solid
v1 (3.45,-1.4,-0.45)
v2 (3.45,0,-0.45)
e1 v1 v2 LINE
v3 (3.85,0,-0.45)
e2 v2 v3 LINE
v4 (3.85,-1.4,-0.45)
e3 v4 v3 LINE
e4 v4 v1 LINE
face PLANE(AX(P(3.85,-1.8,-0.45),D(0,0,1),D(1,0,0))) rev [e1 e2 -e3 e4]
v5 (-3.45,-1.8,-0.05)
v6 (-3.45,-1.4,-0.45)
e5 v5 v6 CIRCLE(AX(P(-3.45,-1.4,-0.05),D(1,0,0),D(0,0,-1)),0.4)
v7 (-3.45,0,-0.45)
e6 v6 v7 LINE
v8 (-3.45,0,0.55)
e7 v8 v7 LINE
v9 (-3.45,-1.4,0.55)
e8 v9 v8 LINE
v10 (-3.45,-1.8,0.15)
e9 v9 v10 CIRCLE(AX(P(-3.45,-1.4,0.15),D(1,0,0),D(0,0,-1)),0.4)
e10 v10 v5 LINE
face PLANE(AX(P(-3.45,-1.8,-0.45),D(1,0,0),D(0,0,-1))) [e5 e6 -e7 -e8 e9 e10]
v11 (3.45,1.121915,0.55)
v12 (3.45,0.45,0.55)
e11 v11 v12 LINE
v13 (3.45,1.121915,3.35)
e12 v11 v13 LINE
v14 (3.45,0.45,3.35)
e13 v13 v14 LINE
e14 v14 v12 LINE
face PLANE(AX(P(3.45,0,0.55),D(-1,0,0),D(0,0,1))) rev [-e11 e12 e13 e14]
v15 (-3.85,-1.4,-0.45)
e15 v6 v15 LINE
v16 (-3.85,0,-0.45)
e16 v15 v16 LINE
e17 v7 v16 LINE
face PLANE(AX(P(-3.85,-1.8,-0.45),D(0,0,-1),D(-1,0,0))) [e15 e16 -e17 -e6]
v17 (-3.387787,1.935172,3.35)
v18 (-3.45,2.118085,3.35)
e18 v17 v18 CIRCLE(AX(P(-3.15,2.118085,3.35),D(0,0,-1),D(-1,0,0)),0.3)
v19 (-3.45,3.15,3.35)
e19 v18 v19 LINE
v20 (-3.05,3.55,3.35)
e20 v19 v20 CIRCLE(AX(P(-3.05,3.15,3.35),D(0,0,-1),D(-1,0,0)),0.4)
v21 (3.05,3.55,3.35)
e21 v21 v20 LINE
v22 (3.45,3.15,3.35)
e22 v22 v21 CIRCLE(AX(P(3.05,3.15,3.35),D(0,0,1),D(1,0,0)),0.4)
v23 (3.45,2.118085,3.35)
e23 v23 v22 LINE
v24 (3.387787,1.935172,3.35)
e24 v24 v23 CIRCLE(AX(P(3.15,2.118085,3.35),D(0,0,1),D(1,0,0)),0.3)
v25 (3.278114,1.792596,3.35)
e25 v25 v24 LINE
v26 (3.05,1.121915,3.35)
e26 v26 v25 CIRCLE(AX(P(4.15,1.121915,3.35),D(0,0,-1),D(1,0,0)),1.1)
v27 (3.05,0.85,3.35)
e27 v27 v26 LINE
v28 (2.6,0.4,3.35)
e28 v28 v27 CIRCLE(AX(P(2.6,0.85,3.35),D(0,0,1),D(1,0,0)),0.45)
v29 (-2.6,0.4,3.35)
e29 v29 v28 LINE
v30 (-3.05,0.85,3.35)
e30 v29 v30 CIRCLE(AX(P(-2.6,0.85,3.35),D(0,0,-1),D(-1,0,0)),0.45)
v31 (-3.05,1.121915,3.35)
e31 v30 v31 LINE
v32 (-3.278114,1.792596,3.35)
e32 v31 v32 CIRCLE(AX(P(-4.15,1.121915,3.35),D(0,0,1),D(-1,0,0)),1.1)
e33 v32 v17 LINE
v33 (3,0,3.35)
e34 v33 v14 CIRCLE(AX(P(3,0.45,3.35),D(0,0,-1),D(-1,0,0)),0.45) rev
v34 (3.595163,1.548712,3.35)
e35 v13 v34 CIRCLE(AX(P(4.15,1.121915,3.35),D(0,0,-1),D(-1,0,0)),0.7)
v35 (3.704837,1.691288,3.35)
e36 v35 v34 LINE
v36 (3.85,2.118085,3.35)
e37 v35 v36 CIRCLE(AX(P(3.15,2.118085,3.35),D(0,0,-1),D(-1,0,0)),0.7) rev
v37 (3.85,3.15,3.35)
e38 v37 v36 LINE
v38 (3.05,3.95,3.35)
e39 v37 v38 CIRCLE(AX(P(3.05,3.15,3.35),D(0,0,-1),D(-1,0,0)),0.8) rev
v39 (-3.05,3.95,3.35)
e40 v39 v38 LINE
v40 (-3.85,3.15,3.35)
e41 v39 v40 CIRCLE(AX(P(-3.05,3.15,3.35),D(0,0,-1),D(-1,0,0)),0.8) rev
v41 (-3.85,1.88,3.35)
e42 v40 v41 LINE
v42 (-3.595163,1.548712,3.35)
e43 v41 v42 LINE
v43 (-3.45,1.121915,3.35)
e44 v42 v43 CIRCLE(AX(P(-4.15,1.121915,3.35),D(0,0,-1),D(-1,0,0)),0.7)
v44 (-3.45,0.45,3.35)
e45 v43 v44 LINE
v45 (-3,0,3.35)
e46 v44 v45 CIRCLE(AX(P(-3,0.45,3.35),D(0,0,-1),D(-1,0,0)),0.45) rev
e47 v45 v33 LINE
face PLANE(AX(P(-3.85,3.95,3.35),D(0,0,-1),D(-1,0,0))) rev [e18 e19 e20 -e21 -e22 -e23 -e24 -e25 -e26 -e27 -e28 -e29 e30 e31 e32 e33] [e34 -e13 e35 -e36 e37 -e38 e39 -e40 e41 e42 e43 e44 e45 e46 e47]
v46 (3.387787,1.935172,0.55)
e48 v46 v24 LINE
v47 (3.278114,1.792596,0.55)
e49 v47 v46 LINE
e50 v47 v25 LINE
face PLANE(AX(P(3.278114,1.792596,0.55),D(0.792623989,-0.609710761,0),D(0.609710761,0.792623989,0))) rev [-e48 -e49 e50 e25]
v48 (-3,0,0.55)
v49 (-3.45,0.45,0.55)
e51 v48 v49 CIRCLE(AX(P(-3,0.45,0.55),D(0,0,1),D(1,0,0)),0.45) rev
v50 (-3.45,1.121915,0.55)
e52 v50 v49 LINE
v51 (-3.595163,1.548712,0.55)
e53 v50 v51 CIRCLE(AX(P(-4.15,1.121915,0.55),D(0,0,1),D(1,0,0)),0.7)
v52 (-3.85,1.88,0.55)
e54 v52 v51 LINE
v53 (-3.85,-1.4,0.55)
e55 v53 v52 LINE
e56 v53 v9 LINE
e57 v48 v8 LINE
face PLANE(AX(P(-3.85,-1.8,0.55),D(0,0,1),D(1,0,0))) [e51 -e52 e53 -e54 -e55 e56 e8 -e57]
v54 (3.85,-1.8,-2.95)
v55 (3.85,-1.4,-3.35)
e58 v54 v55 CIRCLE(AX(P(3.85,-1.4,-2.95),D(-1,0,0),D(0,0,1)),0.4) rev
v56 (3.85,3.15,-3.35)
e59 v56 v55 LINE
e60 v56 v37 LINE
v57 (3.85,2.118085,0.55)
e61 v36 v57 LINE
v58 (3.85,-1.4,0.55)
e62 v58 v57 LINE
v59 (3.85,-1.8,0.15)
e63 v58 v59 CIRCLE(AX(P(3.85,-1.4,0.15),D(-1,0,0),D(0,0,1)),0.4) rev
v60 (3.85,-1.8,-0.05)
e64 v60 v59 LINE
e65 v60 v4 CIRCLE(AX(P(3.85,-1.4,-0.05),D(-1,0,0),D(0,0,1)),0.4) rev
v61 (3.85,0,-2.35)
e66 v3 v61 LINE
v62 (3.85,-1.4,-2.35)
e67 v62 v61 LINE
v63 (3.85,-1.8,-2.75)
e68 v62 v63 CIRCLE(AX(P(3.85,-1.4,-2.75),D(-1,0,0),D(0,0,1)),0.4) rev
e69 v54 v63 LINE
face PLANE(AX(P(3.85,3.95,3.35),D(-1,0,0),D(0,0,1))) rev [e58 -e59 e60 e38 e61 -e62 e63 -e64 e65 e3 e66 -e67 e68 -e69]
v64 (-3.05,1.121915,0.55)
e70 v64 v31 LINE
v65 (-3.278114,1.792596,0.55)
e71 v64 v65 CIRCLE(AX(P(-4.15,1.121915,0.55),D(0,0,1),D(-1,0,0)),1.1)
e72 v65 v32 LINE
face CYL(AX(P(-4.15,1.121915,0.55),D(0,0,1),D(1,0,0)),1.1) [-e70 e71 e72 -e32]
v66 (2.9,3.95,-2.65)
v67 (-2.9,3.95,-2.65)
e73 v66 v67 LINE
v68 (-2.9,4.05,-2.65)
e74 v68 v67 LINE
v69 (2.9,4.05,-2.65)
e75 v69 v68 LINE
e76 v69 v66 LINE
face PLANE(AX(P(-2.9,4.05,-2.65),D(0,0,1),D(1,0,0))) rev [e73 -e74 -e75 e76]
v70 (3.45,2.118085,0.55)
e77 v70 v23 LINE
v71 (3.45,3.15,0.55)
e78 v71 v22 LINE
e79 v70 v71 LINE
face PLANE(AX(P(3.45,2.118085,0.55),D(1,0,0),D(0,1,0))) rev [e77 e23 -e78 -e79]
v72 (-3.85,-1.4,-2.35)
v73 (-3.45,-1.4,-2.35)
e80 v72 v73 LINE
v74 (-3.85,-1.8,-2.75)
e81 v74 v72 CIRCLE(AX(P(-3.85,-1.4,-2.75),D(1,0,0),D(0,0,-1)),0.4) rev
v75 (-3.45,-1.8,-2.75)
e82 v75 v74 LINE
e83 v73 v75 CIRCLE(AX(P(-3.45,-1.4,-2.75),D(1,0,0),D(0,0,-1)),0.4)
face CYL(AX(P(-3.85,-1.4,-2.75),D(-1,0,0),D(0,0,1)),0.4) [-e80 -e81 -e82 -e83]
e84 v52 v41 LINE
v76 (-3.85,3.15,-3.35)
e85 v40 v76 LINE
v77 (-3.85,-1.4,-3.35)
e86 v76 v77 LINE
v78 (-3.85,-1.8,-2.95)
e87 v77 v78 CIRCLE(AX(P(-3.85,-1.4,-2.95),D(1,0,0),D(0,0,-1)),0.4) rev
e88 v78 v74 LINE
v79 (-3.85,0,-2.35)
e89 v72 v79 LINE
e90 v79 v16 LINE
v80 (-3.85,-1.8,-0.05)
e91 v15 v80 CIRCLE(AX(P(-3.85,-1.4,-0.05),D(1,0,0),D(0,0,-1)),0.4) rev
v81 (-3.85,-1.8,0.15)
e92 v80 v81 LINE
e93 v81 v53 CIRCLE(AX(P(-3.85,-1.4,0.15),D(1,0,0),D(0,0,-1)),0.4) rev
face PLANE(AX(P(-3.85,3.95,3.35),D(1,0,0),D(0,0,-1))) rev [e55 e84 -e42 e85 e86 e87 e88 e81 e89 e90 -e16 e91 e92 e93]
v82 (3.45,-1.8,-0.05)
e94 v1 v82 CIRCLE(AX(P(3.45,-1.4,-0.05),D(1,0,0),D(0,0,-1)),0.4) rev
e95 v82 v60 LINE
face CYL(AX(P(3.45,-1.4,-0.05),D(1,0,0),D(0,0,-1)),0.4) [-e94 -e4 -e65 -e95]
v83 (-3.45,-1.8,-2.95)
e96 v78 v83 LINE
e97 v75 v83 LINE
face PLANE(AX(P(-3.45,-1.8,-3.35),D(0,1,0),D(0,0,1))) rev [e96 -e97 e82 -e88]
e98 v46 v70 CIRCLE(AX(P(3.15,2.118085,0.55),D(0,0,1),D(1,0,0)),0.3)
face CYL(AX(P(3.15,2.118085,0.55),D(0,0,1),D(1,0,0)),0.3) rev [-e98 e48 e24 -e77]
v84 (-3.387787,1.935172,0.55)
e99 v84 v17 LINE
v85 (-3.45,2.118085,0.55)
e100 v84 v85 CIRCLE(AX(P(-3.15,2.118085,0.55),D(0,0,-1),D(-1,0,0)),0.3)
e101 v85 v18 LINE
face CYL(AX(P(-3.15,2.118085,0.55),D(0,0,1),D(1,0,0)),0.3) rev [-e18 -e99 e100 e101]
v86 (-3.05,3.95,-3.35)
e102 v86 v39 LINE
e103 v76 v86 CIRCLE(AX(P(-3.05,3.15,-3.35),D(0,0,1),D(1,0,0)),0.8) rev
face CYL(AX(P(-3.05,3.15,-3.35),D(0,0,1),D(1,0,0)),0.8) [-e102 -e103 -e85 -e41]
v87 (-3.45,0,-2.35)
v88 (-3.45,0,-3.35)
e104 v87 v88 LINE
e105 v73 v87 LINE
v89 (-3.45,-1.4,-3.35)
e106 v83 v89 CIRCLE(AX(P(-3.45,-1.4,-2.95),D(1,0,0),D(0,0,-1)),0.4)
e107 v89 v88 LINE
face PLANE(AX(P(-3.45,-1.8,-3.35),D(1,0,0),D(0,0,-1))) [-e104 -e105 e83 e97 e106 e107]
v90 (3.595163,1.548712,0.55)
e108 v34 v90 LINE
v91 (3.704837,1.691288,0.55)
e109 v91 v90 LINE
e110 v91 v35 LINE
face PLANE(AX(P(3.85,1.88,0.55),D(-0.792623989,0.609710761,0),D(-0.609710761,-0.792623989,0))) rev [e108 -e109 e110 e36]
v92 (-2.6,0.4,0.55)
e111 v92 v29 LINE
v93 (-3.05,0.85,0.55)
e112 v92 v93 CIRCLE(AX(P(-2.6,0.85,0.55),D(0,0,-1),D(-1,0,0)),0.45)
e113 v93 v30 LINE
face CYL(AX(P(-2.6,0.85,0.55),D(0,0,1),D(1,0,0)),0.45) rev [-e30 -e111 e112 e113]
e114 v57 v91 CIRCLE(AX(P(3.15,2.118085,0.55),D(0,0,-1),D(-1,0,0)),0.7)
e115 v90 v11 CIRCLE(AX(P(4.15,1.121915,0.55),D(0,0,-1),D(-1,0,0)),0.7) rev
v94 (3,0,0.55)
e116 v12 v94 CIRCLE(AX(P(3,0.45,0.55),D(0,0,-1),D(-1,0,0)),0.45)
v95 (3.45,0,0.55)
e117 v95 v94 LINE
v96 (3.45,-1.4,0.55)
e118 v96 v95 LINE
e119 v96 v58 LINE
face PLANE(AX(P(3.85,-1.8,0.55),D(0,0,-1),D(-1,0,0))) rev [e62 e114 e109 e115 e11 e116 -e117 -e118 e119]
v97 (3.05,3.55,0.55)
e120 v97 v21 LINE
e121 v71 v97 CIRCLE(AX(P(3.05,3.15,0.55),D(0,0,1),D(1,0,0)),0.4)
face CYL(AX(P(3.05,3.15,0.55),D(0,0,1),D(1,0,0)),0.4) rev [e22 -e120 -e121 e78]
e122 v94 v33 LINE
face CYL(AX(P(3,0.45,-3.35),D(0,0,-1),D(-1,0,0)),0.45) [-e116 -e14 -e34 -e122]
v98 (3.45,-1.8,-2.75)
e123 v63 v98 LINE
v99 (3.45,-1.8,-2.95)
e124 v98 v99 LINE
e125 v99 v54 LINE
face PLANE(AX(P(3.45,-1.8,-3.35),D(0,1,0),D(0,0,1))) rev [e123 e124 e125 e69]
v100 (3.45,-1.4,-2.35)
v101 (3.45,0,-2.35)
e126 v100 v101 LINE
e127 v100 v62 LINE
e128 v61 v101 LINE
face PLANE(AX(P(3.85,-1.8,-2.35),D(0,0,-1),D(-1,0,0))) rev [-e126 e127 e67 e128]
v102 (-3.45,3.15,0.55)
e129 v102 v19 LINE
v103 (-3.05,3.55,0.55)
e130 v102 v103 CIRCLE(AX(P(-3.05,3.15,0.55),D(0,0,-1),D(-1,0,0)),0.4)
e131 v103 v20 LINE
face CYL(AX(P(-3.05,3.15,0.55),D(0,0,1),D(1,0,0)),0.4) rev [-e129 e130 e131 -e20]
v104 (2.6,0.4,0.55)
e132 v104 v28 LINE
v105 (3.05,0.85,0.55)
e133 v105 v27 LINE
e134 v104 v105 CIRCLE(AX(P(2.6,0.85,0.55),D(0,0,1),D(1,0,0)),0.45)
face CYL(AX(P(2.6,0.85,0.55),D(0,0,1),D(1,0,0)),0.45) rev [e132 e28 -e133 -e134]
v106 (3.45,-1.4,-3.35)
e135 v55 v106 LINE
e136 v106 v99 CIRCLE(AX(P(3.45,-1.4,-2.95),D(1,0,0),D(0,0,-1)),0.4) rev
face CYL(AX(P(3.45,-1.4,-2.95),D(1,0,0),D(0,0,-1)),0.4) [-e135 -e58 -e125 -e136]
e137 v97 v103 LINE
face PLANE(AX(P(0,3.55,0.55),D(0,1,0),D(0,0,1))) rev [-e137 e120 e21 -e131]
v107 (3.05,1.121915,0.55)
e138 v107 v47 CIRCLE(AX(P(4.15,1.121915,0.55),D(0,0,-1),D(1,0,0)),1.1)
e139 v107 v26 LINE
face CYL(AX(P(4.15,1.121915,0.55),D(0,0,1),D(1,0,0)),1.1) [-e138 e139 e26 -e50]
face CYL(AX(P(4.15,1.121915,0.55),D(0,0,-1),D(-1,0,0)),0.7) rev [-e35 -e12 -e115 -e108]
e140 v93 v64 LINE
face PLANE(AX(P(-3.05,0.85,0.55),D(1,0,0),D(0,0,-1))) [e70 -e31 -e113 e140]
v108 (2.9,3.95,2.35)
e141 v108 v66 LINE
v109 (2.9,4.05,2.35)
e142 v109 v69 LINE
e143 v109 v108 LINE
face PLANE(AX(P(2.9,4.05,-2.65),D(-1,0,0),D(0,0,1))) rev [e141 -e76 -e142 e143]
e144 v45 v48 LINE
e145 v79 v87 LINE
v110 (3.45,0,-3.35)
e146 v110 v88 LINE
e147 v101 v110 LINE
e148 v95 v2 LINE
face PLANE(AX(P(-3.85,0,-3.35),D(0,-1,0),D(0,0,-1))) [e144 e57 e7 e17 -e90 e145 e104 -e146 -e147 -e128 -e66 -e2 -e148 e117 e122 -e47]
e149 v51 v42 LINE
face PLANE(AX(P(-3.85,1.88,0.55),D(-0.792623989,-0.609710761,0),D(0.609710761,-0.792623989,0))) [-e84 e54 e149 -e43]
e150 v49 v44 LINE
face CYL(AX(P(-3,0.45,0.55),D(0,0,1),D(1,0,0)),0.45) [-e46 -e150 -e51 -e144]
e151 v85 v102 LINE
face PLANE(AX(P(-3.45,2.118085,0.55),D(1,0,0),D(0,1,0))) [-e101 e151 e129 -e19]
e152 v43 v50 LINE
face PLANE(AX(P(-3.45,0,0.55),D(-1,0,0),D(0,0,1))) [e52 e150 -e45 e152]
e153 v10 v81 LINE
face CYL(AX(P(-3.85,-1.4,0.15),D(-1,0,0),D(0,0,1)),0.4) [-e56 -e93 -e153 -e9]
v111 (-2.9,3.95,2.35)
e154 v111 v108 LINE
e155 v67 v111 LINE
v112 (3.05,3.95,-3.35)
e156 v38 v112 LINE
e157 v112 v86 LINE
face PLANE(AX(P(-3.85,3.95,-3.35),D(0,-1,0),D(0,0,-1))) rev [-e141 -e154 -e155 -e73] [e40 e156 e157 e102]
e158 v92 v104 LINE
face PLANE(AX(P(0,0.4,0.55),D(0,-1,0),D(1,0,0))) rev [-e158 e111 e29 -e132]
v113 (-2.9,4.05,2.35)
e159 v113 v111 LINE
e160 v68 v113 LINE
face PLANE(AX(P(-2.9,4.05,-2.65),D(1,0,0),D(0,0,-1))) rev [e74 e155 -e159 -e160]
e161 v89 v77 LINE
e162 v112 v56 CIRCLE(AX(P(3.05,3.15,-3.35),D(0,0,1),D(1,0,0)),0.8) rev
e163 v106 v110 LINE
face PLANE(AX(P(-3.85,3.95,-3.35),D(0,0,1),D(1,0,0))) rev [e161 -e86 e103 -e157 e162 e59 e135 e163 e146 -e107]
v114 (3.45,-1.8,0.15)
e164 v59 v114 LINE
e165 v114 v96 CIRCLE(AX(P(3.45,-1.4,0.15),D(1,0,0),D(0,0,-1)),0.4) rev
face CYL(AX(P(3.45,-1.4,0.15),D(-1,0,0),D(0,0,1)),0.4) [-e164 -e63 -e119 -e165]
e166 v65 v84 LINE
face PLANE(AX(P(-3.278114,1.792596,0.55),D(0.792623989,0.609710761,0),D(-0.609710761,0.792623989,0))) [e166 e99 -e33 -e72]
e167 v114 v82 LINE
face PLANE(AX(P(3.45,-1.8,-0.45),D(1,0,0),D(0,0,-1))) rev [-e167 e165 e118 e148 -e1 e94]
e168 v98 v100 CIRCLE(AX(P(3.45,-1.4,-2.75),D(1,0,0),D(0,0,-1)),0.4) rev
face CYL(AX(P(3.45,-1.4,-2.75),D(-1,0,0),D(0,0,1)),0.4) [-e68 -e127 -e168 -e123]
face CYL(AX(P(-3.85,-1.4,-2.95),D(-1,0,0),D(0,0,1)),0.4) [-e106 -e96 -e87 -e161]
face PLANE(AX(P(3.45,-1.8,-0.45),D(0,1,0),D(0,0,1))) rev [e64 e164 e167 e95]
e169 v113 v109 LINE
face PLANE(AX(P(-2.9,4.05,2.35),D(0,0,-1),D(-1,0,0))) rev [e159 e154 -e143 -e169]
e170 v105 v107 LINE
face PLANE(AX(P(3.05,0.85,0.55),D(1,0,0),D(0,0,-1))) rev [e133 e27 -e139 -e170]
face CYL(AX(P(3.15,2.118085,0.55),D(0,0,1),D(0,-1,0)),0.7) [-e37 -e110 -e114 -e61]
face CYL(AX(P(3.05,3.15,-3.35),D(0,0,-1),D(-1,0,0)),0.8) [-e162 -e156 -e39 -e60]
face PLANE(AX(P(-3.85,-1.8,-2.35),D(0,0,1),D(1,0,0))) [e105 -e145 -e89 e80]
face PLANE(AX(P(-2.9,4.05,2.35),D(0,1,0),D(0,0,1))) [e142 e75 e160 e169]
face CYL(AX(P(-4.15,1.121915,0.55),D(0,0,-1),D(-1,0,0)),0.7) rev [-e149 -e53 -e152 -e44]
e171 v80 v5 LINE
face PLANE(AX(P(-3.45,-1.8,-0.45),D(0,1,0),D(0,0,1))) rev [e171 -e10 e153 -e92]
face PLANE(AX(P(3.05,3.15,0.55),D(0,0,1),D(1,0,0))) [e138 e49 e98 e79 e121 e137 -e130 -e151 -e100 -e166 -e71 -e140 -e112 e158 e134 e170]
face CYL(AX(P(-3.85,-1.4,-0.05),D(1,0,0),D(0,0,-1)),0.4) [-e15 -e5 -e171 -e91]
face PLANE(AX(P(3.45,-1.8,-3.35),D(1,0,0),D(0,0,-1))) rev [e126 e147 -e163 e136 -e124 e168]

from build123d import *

# Parameters (mm, degrees)
SKETCH1_W              = 7.7
SKETCH1_H              = 6.7
BOSS_EXTRUDE1_DEPTH    = 3.95
SKETCH2_W              = 0.4
SKETCH2_H              = 1
BOSS_EXTRUDE2_DEPTH    = 1.8
FILLET1_R              = 0.4
LPATTERN1_COUNT        = 2
LPATTERN1_PITCH        = 2.9
FILLET1_OF_LPATTERN1_R = 0.4
FILLET2_R              = 0.8
CUT_EXTRUDE1_DEPTH     = 2.8
FILLET3_R              = 0.45
FILLET4_R              = 0.7
CUT_EXTRUDE2_DEPTH     = 2.8
MIRROR3_START          = 0.55
MIRROR3_DEPTH          = 2.8
MIRROR3_START_2        = -2.95
MIRROR3_2_OUTLINE_W    = 0.4
MIRROR3_2_OUTLINE_H    = 1.8
MIRROR3_2_DEPTH        = 0.2
MIRROR3_START_3        = -0.05
MIRROR3_3_OUTLINE_W    = 0.4
MIRROR3_3_OUTLINE_H    = 1.8
MIRROR3_3_DEPTH        = 0.2
MIRROR3_START_4        = -3.85
MIRROR3_4_DEPTH        = 0.4
SKETCH5_W              = 5.8
SKETCH5_H              = 5
BOSS_EXTRUDE3_DEPTH    = 0.1


with BuildPart() as part:
    # Sketch1 → Boss-Extrude1 (new body)
    with BuildSketch(Plane(origin=(0, 0, 0), x_dir=(1, 0, 0), z_dir=(0, 1, 0))):
        Rectangle(SKETCH1_W, SKETCH1_H)
    extrude(amount=BOSS_EXTRUDE1_DEPTH)

    # Sketch2 → Boss-Extrude2 (add)
    with BuildSketch(Plane.XZ):
        with Locations((3.65, -2.85)):
            Rectangle(SKETCH2_W, SKETCH2_H)
    boss_extrude2 = extrude(amount=BOSS_EXTRUDE2_DEPTH)

    # Fillet1
    fillet1_edges = [part.edges().sort_by_distance(p)[0] for p in [
        (3.65, -1.8, -2.35),
        (3.65, -1.8, -3.35),
    ]]
    fillet(fillet1_edges, radius=FILLET1_R)

    # LPattern1: Boss-Extrude2 ×2
    with Locations(*[(0, 0, i * LPATTERN1_PITCH) for i in range(1, LPATTERN1_COUNT)]):
        add(boss_extrude2)

    # Fillet1 of LPattern1
    fillet1_of_lpattern1_edges = [part.edges().sort_by_distance(p)[0] for p in [
        (3.65, -1.8, 0.55),
        (3.65, -1.8, -0.45),
    ]]
    fillet(fillet1_of_lpattern1_edges, radius=FILLET1_OF_LPATTERN1_R)

    # Fillet2
    fillet2_edges = [part.edges().sort_by_distance(p)[0] for p in [
        (3.85, 3.95, 0),
        (-3.85, 3.95, 0),
    ]]
    fillet(fillet2_edges, radius=FILLET2_R)

    # Sketch3 → Cut-Extrude1 (cut)
    with BuildSketch(Plane.XY.offset(3.35)):
        Polygon((3.85, 1.36), (3.85, 1.88), (3.45, 1.36), (3.45, 0), (3.85, 0), align=None)
    extrude(amount=-CUT_EXTRUDE1_DEPTH, mode=Mode.SUBTRACT)

    # Fillet3
    fillet3_edges = [part.edges().sort_by_distance(p)[0] for p in [
        (3.45, 0, 1.95),
    ]]
    fillet(fillet3_edges, radius=FILLET3_R)

    # Fillet4
    fillet4_edges = [part.edges().sort_by_distance(p)[0] for p in [
        (3.45, 1.36, 1.95),
        (3.85, 1.88, 1.95),
    ]]
    fillet(fillet4_edges, radius=FILLET4_R)

    # Sketch4 → Cut-Extrude2 (cut)
    with BuildSketch(Plane.XY.offset(3.35)):
        with BuildLine():
            Line((0, 0.4), (0, 3.55))
            Line((0, 3.55), (3.05, 3.55))
            ThreePointArc((3.05, 3.55), (3.332842712, 3.432842712), (3.45, 3.15))
            Line((3.45, 3.15), (3.45, 2.118085363))
            ThreePointArc((3.45, 2.118085363), (3.434021266, 2.021483497), (3.387787197, 1.935172134))
            Line((3.387787197, 1.935172134), (3.278113612, 1.792596474))
            ThreePointArc((3.278113612, 1.792596474), (3.108588692, 1.476121479), (3.05, 1.121914637))
            Line((3.05, 1.121914637), (3.05, 0.85))
            ThreePointArc((3.05, 0.85), (2.918198052, 0.531801948), (2.6, 0.4))
            Line((2.6, 0.4), (0, 0.4))
        make_face()
    extrude(amount=-CUT_EXTRUDE2_DEPTH, mode=Mode.SUBTRACT)

    # Mirror3: read off the stored shape, not the designer's step
    # Mirror3 outline → Mirror3 (cut)
    with BuildSketch(Plane.XY.offset(MIRROR3_START)):
        with BuildLine():
            Line((-3.85, 1.88), (-3.85, 0))
            Line((-3.85, 0), (-3, 0))
            ThreePointArc((-3, 0), (-3.318198052, 0.131801948), (-3.45, 0.45))
            Line((-3.45, 0.45), (-3.45, 1.121914637))
            ThreePointArc((-3.45, 1.121914637), (-3.487283713, 1.347318991), (-3.595163208, 1.54871217))
            Line((-3.595163208, 1.54871217), (-3.85, 1.88))
        make_face()
        with BuildLine():
            ThreePointArc((-3.05, 0.85), (-2.918198052, 0.531801948), (-2.6, 0.4))
            Line((-2.6, 0.4), (0, 0.4))
            Line((0, 0.4), (0, 3.55))
            Line((0, 3.55), (-3.05, 3.55))
            ThreePointArc((-3.05, 3.55), (-3.332842712, 3.432842712), (-3.45, 3.15))
            Line((-3.45, 3.15), (-3.45, 2.118085363))
            ThreePointArc((-3.45, 2.118085363), (-3.434021266, 2.021483497), (-3.387787197, 1.935172134))
            Line((-3.387787197, 1.935172134), (-3.278113612, 1.792596474))
            ThreePointArc((-3.278113612, 1.792596474), (-3.108588692, 1.476121478), (-3.05, 1.121914637))
            Line((-3.05, 1.121914637), (-3.05, 0.85))
        make_face()
    extrude(amount=MIRROR3_DEPTH, mode=Mode.SUBTRACT)

    # Mirror3 2 outline → Mirror3 2 (add)
    with BuildSketch(Plane.XY.offset(MIRROR3_START_2)):
        with Locations((-3.65, -0.9)):
            Rectangle(MIRROR3_2_OUTLINE_W, MIRROR3_2_OUTLINE_H)
    extrude(amount=MIRROR3_2_DEPTH)

    # Mirror3 3 outline → Mirror3 3 (add)
    with BuildSketch(Plane.XY.offset(MIRROR3_START_3)):
        with Locations((-3.65, -0.9)):
            Rectangle(MIRROR3_3_OUTLINE_W, MIRROR3_3_OUTLINE_H)
    extrude(amount=MIRROR3_3_DEPTH)

    # Mirror3 4 outline → Mirror3 4 (add)
    with BuildSketch(Plane.YZ.offset(MIRROR3_START_4)):
        with BuildLine():
            Line((0, -2.75), (0, -2.35))
            Line((0, -2.35), (-1.4, -2.35))
            ThreePointArc((-1.4, -2.35), (-1.682842712, -2.467157288), (-1.8, -2.75))
            Line((-1.8, -2.75), (0, -2.75))
        make_face()
        with BuildLine():
            Line((-1.8, 0.15), (0, 0.15))
            Line((0, 0.15), (0, 0.55))
            Line((0, 0.55), (-1.4, 0.55))
            ThreePointArc((-1.4, 0.55), (-1.682842712, 0.432842712), (-1.8, 0.15))
        make_face()
        with BuildLine():
            Line((-1.4, -0.45), (0, -0.45))
            Line((0, -0.45), (0, -0.05))
            Line((0, -0.05), (-1.8, -0.05))
            ThreePointArc((-1.8, -0.05), (-1.682842712, -0.332842712), (-1.4, -0.45))
        make_face()
        with BuildLine():
            Line((0, -3.35), (0, -2.95))
            Line((0, -2.95), (-1.8, -2.95))
            ThreePointArc((-1.8, -2.95), (-1.682842712, -3.232842712), (-1.4, -3.35))
            Line((-1.4, -3.35), (0, -3.35))
        make_face()
    extrude(amount=MIRROR3_4_DEPTH)

    # Sketch5 → Boss-Extrude3 (add)
    with BuildSketch(Plane(origin=(0, 3.95, 0), x_dir=(1, 0, 0), z_dir=(0, 1, 0))):
        with Locations((0, 0.15)):
            Rectangle(SKETCH5_W, SKETCH5_H)
    extrude(amount=BOSS_EXTRUDE3_DEPTH)


solid = part.part
